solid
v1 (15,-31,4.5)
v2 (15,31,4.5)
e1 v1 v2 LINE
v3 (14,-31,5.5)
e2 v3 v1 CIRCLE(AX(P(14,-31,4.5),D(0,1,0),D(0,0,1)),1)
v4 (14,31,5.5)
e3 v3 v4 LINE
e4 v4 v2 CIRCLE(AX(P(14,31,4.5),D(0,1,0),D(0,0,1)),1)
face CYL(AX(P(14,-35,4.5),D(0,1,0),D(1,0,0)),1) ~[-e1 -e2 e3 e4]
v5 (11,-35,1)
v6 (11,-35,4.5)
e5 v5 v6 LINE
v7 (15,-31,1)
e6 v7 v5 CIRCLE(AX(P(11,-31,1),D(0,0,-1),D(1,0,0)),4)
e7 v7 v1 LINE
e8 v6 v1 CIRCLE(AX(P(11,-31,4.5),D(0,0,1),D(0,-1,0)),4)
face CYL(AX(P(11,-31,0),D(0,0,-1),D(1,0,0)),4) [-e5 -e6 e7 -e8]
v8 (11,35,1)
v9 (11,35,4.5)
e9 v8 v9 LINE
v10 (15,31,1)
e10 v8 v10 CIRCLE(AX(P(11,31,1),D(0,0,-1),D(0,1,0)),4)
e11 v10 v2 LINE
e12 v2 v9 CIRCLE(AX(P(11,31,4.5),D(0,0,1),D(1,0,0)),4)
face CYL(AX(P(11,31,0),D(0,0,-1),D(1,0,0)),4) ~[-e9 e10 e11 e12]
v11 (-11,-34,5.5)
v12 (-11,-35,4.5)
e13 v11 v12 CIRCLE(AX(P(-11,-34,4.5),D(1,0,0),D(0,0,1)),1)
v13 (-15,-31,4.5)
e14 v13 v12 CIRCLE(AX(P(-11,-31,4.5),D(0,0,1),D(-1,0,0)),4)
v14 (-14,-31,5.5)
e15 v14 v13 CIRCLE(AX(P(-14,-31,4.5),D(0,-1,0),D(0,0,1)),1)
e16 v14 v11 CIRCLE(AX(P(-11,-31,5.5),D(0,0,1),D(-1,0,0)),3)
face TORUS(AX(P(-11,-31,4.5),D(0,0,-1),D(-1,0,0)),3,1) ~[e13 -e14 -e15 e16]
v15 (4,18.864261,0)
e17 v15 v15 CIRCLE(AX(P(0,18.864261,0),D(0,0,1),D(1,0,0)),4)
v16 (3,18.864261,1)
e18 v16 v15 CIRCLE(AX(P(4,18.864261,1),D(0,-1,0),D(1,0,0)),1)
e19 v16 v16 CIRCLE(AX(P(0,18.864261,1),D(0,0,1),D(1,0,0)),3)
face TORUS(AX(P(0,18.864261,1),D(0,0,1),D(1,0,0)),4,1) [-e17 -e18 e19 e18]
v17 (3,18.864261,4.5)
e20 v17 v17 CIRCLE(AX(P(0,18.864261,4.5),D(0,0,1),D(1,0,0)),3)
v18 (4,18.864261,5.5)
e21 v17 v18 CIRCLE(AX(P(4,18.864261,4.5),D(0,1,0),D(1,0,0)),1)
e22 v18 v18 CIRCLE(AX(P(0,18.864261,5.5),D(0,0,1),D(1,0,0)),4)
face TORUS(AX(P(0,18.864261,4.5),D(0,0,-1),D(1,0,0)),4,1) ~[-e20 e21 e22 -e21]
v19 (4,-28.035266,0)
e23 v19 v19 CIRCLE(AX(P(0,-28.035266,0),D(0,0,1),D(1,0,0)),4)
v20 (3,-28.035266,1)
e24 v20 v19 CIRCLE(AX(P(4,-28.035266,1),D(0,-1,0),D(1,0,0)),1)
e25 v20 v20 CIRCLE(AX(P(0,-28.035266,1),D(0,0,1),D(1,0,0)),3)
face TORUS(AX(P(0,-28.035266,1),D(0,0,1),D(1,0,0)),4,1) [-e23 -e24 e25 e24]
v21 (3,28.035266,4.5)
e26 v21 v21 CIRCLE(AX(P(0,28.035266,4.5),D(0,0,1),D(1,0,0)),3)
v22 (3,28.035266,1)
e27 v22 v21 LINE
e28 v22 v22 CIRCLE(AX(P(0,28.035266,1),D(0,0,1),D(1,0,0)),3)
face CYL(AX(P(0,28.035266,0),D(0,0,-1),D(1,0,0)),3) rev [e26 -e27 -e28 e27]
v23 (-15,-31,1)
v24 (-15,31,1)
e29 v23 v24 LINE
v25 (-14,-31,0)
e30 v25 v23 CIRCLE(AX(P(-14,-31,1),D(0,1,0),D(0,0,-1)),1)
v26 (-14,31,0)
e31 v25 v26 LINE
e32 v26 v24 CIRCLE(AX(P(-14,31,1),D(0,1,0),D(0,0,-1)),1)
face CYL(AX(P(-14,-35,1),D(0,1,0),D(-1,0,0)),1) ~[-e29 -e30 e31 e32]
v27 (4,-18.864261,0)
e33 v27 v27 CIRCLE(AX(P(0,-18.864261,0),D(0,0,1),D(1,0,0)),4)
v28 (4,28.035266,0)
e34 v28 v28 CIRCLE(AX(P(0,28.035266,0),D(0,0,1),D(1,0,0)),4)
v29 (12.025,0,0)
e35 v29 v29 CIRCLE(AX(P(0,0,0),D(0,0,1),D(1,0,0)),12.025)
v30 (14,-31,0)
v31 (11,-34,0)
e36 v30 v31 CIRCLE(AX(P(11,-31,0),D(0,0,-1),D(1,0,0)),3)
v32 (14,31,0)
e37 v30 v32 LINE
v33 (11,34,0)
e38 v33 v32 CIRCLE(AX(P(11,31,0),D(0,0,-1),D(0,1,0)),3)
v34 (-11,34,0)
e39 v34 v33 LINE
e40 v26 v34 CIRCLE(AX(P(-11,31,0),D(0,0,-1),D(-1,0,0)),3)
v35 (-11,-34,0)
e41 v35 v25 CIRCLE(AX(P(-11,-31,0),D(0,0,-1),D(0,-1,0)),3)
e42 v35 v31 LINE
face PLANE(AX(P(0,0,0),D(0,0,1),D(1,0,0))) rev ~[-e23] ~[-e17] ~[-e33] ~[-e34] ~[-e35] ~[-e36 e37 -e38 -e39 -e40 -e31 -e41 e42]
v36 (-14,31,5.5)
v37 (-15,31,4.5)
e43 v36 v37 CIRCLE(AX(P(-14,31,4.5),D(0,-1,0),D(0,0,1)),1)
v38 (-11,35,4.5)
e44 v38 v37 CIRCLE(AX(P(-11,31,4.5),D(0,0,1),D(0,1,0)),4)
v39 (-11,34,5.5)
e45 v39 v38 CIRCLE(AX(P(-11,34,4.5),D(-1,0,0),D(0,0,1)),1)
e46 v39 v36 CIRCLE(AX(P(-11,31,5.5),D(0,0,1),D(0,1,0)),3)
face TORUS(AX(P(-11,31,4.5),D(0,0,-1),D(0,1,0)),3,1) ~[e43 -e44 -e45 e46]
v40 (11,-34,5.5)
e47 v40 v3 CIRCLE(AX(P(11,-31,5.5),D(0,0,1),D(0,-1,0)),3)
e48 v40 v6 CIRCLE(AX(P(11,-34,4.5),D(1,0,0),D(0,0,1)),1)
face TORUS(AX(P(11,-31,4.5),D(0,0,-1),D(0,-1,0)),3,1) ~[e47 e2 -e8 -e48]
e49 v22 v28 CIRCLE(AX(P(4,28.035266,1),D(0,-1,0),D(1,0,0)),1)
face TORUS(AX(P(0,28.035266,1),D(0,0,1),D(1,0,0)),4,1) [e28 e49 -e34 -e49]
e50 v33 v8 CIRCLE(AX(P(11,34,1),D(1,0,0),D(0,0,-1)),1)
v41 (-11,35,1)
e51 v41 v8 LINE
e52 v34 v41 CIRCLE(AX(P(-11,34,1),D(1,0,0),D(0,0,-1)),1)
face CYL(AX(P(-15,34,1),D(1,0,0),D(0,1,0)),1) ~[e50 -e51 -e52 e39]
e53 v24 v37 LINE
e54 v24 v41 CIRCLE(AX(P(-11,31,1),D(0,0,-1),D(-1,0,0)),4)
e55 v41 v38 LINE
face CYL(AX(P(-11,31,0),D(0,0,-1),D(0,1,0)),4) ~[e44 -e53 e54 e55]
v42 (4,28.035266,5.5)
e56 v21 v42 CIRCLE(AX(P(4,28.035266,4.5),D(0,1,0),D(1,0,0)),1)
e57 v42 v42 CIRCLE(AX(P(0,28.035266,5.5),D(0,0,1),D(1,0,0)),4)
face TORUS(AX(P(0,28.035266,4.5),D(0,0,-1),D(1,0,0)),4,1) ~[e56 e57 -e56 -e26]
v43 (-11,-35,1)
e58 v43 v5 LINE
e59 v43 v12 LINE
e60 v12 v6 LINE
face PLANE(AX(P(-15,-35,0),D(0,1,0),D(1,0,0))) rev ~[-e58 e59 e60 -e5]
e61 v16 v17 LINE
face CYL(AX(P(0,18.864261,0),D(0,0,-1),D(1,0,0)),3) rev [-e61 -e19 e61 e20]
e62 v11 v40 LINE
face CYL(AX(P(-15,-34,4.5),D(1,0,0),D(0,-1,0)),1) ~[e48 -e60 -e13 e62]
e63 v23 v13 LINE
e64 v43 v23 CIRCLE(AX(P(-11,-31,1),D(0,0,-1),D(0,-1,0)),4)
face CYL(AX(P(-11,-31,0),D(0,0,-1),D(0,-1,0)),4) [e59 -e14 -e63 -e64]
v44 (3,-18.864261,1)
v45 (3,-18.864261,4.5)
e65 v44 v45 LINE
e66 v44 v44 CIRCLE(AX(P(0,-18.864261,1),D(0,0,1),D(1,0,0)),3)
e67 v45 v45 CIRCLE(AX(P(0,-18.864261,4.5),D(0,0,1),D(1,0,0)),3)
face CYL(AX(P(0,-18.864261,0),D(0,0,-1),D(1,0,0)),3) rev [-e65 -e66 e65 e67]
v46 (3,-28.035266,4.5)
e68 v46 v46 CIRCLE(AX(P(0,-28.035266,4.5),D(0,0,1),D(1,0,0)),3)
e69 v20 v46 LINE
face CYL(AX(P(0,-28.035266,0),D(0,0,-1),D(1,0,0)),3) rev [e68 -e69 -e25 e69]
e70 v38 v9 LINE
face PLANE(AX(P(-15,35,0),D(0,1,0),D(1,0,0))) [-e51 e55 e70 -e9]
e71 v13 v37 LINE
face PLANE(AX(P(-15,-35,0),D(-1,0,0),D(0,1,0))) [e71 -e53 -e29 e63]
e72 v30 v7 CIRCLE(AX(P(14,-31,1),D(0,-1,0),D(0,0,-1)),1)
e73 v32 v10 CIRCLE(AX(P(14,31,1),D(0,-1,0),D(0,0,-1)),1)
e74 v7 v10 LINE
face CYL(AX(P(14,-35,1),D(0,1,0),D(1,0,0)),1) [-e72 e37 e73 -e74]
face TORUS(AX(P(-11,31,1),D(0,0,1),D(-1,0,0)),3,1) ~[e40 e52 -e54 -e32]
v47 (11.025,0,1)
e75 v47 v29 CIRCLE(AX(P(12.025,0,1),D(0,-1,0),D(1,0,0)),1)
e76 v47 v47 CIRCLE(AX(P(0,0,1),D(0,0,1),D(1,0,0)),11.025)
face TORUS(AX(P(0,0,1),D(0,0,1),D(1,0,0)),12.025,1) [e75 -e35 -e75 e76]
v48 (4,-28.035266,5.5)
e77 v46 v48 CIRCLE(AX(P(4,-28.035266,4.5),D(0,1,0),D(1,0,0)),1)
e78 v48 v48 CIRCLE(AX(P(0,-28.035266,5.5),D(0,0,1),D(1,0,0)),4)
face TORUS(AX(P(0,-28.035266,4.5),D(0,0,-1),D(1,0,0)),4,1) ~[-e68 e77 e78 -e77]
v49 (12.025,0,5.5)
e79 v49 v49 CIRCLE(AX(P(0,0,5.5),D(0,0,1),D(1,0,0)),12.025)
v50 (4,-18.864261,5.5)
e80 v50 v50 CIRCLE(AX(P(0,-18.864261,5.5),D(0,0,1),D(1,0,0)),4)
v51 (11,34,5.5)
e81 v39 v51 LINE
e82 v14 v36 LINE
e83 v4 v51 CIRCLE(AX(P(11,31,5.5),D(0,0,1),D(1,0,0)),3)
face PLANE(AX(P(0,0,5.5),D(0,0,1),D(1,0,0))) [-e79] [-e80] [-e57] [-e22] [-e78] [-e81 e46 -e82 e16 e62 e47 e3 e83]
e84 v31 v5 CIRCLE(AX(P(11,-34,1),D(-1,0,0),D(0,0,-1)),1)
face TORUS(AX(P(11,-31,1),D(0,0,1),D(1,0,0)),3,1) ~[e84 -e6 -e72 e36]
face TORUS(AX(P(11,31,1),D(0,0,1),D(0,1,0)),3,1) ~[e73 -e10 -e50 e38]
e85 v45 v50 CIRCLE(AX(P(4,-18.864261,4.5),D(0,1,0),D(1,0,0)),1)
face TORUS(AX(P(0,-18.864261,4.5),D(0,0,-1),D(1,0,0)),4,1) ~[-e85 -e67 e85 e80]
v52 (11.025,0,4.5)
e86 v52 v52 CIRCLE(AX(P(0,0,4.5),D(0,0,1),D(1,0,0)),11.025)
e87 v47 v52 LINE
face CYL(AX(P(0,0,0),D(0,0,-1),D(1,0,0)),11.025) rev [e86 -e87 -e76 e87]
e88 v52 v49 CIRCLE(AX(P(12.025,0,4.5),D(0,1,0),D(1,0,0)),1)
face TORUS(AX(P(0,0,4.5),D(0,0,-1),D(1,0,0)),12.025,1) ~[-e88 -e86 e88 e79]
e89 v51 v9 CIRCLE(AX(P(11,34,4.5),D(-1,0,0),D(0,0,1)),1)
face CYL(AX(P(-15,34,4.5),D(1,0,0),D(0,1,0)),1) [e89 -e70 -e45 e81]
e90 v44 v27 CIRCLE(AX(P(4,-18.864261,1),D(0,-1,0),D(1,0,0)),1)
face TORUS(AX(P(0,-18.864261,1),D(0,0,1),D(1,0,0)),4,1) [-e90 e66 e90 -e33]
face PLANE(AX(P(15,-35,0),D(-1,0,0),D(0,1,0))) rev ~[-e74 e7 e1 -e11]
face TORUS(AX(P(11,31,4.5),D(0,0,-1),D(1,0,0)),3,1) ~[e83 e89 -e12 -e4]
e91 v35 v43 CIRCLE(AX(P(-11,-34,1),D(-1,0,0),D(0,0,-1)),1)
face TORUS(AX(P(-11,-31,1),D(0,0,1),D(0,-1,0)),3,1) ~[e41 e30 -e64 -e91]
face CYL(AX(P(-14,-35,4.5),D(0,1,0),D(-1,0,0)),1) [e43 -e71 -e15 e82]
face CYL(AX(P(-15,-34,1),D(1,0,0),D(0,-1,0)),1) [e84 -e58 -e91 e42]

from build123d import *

# Parameters (mm, degrees)
F0_W         = 30
F0_H         = 70
F0_R         = 3
F0_R_2       = 11.025
F1_DEPTH     = 5.5
F2_R         = 1
F3_T1_DEPTH  = 5.5
F3_T4_ANGLE  = 90
F3_T6_ANGLE  = 90
F3_T8_ANGLE  = 90
F3_T10_ANGLE = 90
F3_T12_ANGLE = 90
F3_T14_ANGLE = 90
F3_T16_ANGLE = 90
F3_T18_ANGLE = 90


# Not quite as in the source:
# - a fillet or chamfer that OpenCascade refuses, or shapes differently, is made with other operations: its cross-section is extruded or revolved along the edge and cut away or added


with BuildPart() as f1:
    # F0 (on Top) → F1 (new body)
    with BuildSketch(Plane.XY):
        Rectangle(F0_W, F0_H)
        with Locations((0, -28.0352663249)):
            Circle(F0_R, mode=Mode.SUBTRACT)
        with Locations((0, -18.8642609864)):
            Circle(F0_R, mode=Mode.SUBTRACT)
        Circle(F0_R_2, mode=Mode.SUBTRACT)
        with Locations((0, 18.8642609864)):
            Circle(F0_R, mode=Mode.SUBTRACT)
        with Locations((0, 28.0352663249)):
            Circle(F0_R, mode=Mode.SUBTRACT)
    extrude(amount=F1_DEPTH)

    # F2
    f2_edges = [f1.edges().sort_by_distance(p)[0] for p in [
        (15, 0, 5.5),
        (0, 35, 5.5),
        (-15, 0, 5.5),
        (0, -35, 5.5),
        (-3, -28.035266, 5.5),
        (-3, -18.864261, 5.5),
        (-11.025, 0, 5.5),
        (-3, 18.864261, 5.5),
        (-3, 28.035266, 5.5),
        (15, 0, 0),
        (0, 35, 0),
        (-15, 0, 0),
        (0, -35, 0),
        (-3, -28.035266, 0),
        (-3, -18.864261, 0),
        (-11.025, 0, 0),
        (-3, 18.864261, 0),
        (-3, 28.035266, 0),
    ]]
    fillet(f2_edges, radius=F2_R)

    # F3: fillet of radius 4 on 4 edges, made by hand

    # F3_s2 → F3_t1 (cut)
    with BuildSketch(Plane.XY):
        with BuildLine():
            ThreePointArc((-11, -35), (-13.8284271247, -33.8284271247), (-15, -31))
            Line((-15, -31), (-15, -35))
            Line((-15, -35), (-11, -35))
        make_face()
        with BuildLine():
            ThreePointArc((15, -31), (13.8284271247, -33.8284271247), (11, -35))
            Line((11, -35), (15, -35))
            Line((15, -35), (15, -31))
        make_face()
        with BuildLine():
            ThreePointArc((15, 31), (13.8284271247, 33.8284271247), (11, 35))
            Line((11, 35), (15, 35))
            Line((15, 35), (15, 31))
        make_face()
        with BuildLine():
            ThreePointArc((-11, 35), (-13.8284271247, 33.8284271247), (-15, 31))
            Line((-15, 31), (-15, 35))
            Line((-15, 35), (-11, 35))
        make_face()
    extrude(amount=F3_T1_DEPTH, mode=Mode.SUBTRACT)

    # F3_s3 → F3_t4 (revolve, cut)
    with BuildSketch(Plane.XZ.offset(-31)):
        with BuildLine():
            ThreePointArc((-14, 0), (-14.7071067812, 0.2928932188), (-15, 1))
            Line((-15, 1), (-15, 0))
            Line((-15, 0), (-14, 0))
        make_face()
    revolve(axis=Axis((-11, 31, 0), (0, 0, -1)), revolution_arc=F3_T4_ANGLE, mode=Mode.SUBTRACT)

    # F3_s5 → F3_t6 (revolve, cut)
    with BuildSketch(Plane.YZ.offset(-11)):
        with BuildLine():
            ThreePointArc((34, 5.5), (34.7071067812, 5.2071067812), (35, 4.5))
            Line((35, 4.5), (35, 5.5))
            Line((35, 5.5), (34, 5.5))
        make_face()
    revolve(axis=Axis((-11, 31, 5.5), (0, 0, 1)), revolution_arc=F3_T6_ANGLE, mode=Mode.SUBTRACT)

    # F3_s7 → F3_t8 (revolve, cut)
    with BuildSketch(Plane.YZ.offset(11)):
        with BuildLine():
            ThreePointArc((34, 0), (34.7071067812, 0.2928932188), (35, 1))
            Line((35, 1), (35, 0))
            Line((35, 0), (34, 0))
        make_face()
    revolve(axis=Axis((11, 31, 0), (0, 0, -1)), revolution_arc=F3_T8_ANGLE, mode=Mode.SUBTRACT)

    # F3_s9 → F3_t10 (revolve, cut)
    with BuildSketch(Plane.XZ.offset(-31)):
        with BuildLine():
            ThreePointArc((14, 5.5), (14.7071067812, 5.2071067812), (15, 4.5))
            Line((15, 4.5), (15, 5.5))
            Line((15, 5.5), (14, 5.5))
        make_face()
    revolve(axis=Axis((11, 31, 5.5), (0, 0, 1)), revolution_arc=F3_T10_ANGLE, mode=Mode.SUBTRACT)

    # F3_s11 → F3_t12 (revolve, cut)
    with BuildSketch(Plane.XZ.offset(31)):
        with BuildLine():
            ThreePointArc((14, 0), (14.7071067812, 0.2928932188), (15, 1))
            Line((15, 1), (15, 0))
            Line((15, 0), (14, 0))
        make_face()
    revolve(axis=Axis((11, -31, 0), (0, 0, -1)), revolution_arc=F3_T12_ANGLE, mode=Mode.SUBTRACT)

    # F3_s13 → F3_t14 (revolve, cut)
    with BuildSketch(Plane.YZ.offset(11)):
        with BuildLine():
            ThreePointArc((-34, 5.5), (-34.7071067812, 5.2071067812), (-35, 4.5))
            Line((-35, 4.5), (-35, 5.5))
            Line((-35, 5.5), (-34, 5.5))
        make_face()
    revolve(axis=Axis((11, -31, 5.5), (0, 0, 1)), revolution_arc=F3_T14_ANGLE, mode=Mode.SUBTRACT)

    # F3_s15 → F3_t16 (revolve, cut)
    with BuildSketch(Plane.YZ.offset(-11)):
        with BuildLine():
            ThreePointArc((-34, 0), (-34.7071067812, 0.2928932188), (-35, 1))
            Line((-35, 1), (-35, 0))
            Line((-35, 0), (-34, 0))
        make_face()
    revolve(axis=Axis((-11, -31, 0), (0, 0, -1)), revolution_arc=F3_T16_ANGLE, mode=Mode.SUBTRACT)

    # F3_s17 → F3_t18 (revolve, cut)
    with BuildSketch(Plane.XZ.offset(31)):
        with BuildLine():
            ThreePointArc((-14, 5.5), (-14.7071067812, 5.2071067812), (-15, 4.5))
            Line((-15, 4.5), (-15, 5.5))
            Line((-15, 5.5), (-14, 5.5))
        make_face()
    revolve(axis=Axis((-11, -31, 5.5), (0, 0, 1)), revolution_arc=F3_T18_ANGLE, mode=Mode.SUBTRACT)


solid = f1.part
